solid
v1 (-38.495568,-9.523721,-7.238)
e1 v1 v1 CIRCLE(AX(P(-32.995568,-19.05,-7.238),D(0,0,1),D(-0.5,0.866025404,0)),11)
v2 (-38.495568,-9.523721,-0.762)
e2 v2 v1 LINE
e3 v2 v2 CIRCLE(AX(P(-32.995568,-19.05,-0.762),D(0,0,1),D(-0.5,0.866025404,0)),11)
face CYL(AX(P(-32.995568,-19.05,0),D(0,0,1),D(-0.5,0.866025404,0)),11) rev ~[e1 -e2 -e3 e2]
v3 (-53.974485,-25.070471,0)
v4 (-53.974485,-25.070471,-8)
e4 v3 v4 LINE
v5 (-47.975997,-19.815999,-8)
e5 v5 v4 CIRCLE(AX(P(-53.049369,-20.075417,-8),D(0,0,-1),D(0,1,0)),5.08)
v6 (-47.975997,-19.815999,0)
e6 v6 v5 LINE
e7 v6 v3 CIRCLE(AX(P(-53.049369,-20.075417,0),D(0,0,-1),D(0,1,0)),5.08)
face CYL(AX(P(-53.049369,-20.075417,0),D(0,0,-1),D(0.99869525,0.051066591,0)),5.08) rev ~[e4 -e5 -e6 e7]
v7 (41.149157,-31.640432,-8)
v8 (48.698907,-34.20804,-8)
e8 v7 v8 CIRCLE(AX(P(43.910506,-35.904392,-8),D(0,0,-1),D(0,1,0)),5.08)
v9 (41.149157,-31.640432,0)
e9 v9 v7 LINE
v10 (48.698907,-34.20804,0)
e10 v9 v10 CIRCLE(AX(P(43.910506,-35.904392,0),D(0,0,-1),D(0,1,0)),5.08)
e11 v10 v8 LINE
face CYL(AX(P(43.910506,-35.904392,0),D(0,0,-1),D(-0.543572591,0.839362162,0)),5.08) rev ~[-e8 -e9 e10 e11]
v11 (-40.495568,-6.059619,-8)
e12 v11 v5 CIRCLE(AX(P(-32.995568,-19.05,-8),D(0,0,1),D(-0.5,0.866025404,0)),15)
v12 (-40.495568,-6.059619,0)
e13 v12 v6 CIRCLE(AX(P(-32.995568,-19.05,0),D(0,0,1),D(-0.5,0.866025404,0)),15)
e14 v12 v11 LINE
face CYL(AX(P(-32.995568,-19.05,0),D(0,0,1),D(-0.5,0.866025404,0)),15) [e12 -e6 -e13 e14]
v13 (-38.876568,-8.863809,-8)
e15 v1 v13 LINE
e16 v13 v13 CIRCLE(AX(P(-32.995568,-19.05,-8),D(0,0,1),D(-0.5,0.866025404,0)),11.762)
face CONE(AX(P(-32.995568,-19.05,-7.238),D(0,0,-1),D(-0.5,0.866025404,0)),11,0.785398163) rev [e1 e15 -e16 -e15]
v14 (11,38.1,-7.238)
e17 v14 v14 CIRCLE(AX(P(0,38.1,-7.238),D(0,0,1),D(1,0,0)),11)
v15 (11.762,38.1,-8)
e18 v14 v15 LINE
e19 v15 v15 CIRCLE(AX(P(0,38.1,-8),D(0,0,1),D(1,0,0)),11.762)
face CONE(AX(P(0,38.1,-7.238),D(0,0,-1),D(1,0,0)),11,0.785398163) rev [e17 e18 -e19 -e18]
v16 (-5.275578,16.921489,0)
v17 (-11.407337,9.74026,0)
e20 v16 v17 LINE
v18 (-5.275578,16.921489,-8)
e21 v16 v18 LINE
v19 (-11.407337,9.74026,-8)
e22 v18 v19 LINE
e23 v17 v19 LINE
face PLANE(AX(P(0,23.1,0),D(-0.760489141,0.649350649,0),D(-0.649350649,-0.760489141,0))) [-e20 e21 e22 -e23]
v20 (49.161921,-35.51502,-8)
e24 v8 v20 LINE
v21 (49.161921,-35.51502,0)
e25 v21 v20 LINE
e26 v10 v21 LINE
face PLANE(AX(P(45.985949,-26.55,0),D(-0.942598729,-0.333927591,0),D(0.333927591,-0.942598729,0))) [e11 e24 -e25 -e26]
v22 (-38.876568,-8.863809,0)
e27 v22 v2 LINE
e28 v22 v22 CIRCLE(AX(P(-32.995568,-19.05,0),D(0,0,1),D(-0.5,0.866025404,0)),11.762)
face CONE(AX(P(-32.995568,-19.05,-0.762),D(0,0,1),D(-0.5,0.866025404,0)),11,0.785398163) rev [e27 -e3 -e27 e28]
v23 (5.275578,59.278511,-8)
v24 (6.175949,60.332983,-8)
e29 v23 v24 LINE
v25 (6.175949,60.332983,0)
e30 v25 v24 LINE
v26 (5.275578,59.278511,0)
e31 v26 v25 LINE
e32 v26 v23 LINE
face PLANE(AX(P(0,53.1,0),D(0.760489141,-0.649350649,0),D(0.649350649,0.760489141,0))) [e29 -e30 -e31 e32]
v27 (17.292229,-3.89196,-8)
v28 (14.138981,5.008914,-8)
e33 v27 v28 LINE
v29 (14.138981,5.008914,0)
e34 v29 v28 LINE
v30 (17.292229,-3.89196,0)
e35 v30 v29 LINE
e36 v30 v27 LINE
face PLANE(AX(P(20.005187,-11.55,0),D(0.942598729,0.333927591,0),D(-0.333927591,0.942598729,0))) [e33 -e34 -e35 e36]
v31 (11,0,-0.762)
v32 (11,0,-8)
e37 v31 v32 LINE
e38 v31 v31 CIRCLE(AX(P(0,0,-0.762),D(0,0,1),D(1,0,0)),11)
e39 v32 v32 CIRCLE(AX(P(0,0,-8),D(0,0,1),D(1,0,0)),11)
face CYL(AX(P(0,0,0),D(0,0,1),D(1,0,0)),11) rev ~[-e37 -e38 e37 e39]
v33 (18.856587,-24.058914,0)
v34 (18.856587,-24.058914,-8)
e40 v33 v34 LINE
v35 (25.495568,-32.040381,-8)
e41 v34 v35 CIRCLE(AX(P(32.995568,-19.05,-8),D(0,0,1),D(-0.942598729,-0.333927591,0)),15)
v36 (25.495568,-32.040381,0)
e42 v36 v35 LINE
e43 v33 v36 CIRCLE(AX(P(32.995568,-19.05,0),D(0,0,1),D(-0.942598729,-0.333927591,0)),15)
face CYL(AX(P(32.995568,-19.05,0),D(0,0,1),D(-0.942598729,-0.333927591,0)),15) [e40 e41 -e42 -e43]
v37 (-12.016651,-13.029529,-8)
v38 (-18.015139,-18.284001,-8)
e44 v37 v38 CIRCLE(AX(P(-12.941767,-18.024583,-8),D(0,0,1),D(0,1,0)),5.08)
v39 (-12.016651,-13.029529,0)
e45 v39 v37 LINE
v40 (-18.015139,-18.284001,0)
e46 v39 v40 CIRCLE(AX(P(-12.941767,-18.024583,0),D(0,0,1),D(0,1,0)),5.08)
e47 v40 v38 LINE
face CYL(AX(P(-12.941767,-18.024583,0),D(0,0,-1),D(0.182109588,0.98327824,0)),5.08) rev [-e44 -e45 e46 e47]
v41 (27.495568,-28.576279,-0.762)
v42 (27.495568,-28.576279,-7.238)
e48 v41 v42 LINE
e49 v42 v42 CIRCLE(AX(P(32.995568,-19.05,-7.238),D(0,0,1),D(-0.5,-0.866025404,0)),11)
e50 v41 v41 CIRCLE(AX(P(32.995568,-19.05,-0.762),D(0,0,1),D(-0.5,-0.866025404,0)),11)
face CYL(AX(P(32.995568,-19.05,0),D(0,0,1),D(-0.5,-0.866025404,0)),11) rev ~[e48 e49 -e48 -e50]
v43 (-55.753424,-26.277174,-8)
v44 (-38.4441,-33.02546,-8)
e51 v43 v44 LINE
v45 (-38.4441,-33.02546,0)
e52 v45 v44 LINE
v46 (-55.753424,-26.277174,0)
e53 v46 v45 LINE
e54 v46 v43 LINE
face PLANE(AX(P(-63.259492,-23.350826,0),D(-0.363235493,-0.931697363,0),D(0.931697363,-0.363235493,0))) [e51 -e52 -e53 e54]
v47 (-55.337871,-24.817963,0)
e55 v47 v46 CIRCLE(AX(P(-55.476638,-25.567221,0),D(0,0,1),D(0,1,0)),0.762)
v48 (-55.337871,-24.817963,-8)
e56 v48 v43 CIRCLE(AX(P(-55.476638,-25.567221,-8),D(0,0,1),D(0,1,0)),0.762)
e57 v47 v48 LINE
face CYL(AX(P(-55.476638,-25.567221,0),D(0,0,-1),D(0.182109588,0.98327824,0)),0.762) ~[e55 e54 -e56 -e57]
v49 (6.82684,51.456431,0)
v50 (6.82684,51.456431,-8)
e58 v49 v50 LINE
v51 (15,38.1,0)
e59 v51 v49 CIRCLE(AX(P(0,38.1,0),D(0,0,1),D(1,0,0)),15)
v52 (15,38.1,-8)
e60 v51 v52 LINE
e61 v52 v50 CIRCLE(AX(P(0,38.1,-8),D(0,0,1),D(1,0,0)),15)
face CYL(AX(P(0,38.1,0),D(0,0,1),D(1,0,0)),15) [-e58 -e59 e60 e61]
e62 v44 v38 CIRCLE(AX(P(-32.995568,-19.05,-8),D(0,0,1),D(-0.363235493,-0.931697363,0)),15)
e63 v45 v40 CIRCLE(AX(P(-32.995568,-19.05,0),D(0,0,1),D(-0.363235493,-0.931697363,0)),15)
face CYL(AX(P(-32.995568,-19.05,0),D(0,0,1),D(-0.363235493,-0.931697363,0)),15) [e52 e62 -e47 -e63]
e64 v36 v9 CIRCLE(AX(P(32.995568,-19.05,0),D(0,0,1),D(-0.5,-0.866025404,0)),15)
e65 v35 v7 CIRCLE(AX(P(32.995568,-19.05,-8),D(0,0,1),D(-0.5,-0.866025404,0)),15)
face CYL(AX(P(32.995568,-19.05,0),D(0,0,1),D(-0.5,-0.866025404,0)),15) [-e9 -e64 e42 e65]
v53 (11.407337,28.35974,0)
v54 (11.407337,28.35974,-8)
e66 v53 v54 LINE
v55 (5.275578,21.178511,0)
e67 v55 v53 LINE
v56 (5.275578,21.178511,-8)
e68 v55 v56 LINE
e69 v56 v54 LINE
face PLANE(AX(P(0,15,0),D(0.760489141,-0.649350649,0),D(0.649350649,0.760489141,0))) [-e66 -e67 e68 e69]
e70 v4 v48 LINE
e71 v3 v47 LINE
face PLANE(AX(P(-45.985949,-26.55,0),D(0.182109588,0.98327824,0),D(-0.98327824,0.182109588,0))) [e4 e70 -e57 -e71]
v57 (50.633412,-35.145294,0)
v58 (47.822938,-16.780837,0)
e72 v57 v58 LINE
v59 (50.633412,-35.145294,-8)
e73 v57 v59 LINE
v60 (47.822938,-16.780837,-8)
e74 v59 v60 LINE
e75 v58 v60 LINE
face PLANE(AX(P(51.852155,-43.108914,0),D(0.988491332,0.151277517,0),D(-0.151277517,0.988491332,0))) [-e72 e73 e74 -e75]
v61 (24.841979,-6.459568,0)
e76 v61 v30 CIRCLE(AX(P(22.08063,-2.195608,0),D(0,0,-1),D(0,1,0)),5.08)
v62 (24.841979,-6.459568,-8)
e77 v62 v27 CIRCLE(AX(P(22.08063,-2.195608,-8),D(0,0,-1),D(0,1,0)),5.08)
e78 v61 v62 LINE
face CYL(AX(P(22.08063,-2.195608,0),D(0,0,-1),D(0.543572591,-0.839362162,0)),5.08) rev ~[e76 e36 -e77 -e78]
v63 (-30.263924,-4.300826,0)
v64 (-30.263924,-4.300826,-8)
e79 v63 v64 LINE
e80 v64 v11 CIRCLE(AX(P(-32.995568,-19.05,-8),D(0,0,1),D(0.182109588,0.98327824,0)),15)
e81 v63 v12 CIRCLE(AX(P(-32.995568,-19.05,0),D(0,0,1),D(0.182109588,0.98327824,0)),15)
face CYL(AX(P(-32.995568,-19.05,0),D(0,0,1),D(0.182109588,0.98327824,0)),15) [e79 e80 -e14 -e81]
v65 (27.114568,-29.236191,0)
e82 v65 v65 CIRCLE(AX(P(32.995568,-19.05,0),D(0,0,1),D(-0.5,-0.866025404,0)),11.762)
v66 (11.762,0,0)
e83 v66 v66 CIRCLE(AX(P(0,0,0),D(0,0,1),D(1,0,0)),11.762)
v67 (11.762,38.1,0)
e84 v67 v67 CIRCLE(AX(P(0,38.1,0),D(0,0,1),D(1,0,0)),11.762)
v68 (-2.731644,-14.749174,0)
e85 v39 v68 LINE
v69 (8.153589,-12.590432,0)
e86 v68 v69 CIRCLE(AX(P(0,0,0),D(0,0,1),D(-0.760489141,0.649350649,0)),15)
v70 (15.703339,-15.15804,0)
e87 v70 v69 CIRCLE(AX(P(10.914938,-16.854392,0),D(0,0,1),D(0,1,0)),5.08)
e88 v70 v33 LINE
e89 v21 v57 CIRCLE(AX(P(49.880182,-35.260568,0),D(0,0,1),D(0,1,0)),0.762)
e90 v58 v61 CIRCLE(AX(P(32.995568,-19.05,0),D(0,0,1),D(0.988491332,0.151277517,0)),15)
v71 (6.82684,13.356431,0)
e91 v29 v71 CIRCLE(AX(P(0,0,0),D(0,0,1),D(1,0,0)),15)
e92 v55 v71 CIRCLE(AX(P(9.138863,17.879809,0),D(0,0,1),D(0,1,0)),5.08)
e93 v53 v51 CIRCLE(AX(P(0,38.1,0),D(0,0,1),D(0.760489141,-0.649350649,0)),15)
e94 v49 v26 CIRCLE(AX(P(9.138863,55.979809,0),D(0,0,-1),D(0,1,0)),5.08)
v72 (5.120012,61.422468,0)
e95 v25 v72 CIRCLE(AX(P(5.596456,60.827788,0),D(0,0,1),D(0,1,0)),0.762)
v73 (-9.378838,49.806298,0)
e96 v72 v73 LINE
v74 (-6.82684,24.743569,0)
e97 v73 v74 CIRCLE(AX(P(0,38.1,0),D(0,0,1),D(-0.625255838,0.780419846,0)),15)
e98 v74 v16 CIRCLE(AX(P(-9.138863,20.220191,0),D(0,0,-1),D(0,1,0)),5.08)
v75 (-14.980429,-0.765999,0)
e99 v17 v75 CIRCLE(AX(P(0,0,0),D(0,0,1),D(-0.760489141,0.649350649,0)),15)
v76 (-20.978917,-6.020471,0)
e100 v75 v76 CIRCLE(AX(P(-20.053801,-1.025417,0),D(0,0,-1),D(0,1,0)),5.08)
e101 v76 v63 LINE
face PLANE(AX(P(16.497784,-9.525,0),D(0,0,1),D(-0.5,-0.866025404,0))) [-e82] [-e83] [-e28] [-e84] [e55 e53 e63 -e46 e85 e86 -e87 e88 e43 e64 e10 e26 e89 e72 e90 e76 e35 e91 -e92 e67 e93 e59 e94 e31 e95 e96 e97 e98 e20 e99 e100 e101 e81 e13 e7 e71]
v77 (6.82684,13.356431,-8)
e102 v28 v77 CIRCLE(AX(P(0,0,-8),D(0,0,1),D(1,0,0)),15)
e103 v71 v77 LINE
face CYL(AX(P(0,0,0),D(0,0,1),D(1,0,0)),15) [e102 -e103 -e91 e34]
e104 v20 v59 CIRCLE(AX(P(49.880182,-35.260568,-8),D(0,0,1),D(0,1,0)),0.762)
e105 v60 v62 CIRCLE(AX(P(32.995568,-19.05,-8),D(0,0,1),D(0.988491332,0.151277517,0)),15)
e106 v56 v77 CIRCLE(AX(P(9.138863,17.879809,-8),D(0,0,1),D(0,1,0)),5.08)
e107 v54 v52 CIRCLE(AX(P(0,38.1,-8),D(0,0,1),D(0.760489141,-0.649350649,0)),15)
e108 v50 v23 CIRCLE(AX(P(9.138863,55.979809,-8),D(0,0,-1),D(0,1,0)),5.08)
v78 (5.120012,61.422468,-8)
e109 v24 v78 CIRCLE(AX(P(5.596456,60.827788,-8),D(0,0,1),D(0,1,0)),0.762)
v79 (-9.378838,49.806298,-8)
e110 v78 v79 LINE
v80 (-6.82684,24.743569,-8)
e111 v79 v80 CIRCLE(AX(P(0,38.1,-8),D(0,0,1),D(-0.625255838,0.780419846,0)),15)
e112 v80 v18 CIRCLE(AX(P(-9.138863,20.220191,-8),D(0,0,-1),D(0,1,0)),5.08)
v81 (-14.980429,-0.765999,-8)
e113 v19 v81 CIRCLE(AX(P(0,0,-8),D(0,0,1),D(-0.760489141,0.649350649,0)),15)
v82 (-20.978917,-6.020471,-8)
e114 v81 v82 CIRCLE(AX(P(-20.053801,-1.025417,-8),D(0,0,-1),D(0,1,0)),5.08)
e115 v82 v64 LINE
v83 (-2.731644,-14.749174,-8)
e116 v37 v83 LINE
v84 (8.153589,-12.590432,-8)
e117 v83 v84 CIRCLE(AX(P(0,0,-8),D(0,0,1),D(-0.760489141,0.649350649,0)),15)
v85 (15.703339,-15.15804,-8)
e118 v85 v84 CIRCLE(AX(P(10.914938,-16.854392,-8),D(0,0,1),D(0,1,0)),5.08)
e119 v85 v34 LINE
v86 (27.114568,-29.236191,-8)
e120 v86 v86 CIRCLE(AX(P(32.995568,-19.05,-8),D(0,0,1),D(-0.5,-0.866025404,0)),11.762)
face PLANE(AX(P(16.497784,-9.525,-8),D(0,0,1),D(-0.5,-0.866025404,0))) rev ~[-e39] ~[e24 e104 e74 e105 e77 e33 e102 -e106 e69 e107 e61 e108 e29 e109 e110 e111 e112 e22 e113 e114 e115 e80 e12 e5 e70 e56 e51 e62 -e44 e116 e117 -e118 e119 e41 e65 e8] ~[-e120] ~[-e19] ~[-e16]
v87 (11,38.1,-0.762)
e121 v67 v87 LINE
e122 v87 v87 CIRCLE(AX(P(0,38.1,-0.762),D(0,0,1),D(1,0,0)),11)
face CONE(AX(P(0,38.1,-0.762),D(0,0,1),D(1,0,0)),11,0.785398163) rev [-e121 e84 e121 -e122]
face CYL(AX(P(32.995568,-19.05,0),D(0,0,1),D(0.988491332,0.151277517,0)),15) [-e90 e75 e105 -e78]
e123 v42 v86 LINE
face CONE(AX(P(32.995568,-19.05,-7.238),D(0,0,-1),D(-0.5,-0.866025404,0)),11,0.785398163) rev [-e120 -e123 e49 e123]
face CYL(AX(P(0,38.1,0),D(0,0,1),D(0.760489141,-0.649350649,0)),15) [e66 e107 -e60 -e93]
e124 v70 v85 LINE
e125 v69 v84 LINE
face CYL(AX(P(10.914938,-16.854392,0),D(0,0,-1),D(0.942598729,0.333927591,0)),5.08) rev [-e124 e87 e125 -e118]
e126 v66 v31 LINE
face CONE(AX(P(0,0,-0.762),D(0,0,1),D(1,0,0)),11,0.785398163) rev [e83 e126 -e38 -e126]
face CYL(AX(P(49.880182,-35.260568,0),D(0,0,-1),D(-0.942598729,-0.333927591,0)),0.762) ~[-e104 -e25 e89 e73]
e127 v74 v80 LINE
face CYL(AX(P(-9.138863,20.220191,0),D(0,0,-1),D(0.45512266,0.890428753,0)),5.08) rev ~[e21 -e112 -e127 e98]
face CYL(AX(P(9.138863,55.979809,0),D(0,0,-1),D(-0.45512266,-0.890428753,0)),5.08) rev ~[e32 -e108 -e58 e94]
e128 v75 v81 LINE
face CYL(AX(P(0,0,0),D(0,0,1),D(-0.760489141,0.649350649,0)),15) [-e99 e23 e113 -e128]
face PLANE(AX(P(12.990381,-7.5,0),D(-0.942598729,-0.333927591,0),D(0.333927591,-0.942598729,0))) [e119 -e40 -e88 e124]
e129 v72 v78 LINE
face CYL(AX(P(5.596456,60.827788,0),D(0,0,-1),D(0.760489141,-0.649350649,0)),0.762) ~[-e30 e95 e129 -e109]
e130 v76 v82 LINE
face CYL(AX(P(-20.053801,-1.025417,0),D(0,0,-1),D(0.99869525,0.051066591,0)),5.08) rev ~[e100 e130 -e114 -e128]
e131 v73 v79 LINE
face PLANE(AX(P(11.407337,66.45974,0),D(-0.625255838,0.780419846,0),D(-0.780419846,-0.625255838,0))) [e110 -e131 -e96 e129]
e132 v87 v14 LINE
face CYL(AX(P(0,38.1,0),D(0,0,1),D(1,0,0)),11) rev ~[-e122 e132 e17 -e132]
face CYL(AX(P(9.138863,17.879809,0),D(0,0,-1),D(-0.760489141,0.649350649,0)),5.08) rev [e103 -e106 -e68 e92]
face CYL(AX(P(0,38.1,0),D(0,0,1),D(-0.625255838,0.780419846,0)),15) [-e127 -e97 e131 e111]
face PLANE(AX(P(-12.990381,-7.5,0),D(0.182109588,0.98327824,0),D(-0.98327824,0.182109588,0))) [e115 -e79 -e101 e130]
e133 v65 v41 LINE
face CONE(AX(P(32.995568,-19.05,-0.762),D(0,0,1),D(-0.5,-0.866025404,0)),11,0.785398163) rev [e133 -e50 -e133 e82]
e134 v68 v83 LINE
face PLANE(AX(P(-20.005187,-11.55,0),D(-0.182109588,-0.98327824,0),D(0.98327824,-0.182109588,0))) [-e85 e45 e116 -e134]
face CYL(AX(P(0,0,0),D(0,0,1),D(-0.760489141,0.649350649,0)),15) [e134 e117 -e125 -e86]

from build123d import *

# Parameters (mm, degrees)
F0_R            = 11
F1_DEPTH        = 8
F2_DEPTH        = 8
F2_COPIES_COUNT = 3
F3_R            = 5.08
F4_F1_R         = 0.762
F4_F2_R         = 0.762
F4_F3_R         = 0.762
F5_SIZE         = 0.762


# Not quite as in the source:
# - a pattern or mirror of a feature is missing from the dataset's text; its kind, count and spacing are read off the source's solid


with BuildPart() as f1:
    # F0 (on Top) → F1 (new body)
    with BuildSketch(Plane.XY):
        with BuildLine():
            ThreePointArc((-11.407337121, 9.7402597403), (-5.190854611, -14.0732024929), (15, 0))
            ThreePointArc((15, 0), (10.6066017178, 10.6066017178), (0, 15))
            ThreePointArc((0, 15), (-6.2807684202, 13.6217454114), (-11.407337121, 9.7402597403))
        make_face()
        Circle(F0_R, mode=Mode.SUBTRACT)
    extrude(amount=-F1_DEPTH)

    # F0 (on Top) → F2 (join, through all)
    with BuildSketch(Plane.XY):
        with BuildLine():
            ThreePointArc((-11.407337121, 9.7402597403), (-6.2807684202, 13.6217454114), (0, 15))
            Line((0, 15), (11.407337121, 28.3597402597))
            ThreePointArc((11.407337121, 28.3597402597), (6.2807684202, 24.4782545886), (0, 23.1))
            Line((0, 23.1), (-11.407337121, 9.7402597403))
        make_face()
        with BuildLine():
            ThreePointArc((0, 23.1), (6.2807684202, 24.4782545886), (11.407337121, 28.3597402597))
            ThreePointArc((11.407337121, 28.3597402597), (14.0732024929, 32.909145389), (15, 38.1))
            ThreePointArc((15, 38.1), (10.6066017178, 48.7066017178), (0, 53.1))
            ThreePointArc((0, 53.1), (-4.9701878524, 52.2526404855), (-9.378837576, 49.806297695))
            ThreePointArc((-9.378837576, 49.806297695), (-14.1526404855, 33.1298121476), (0, 23.1))
        make_face()
        with Locations((0, 38.1)):
            Circle(F0_R, mode=Mode.SUBTRACT)
        with BuildLine():
            Line((11.407337121, 66.4597402597), (-9.378837576, 49.806297695))
            ThreePointArc((-9.378837576, 49.806297695), (-4.9701878524, 52.2526404855), (0, 53.1))
            Line((0, 53.1), (11.407337121, 66.4597402597))
        make_face()
    f2 = extrude(amount=-F2_DEPTH)

    # F2_copies: F2 ×3 about axis
    f2_copies_axis = Axis((0, 0, 0), (0, 0, 1))
    for i in range(1, F2_COPIES_COUNT):
        add(f2.rotate(f2_copies_axis, i * 360 / F2_COPIES_COUNT))

    # F3
    f3_edges = [f1.edges().sort_by_distance(p)[0] for p in [
        (0, 15, -4),
        (0, 23.1, -4),
        (0, 53.1, -4),
        (20.005187, -11.55, -4),
        (-12.990381, -7.5, -4),
        (-45.985949, -26.55, -4),
        (-20.005187, -11.55, -4),
        (12.990381, -7.5, -4),
        (45.985949, -26.55, -4),
    ]]
    fillet(f3_edges, radius=F3_R)

    # F4: fillet of radius 0.762 on 3 edges, made by hand

    # F4_f1
    f4_f1_edges = [f1.edges().sort_by_distance(p)[0] for p in [
        (51.8521548333, -43.1089138662, -4),
    ]]
    fillet(f4_f1_edges, radius=F4_F1_R)

    # F4_f2
    f4_f2_edges = [f1.edges().sort_by_distance(p)[0] for p in [
        (11.407337121, 66.4597402597, -4),
    ]]
    fillet(f4_f2_edges, radius=F4_F2_R)

    # F4_f3
    f4_f3_edges = [f1.edges().sort_by_distance(p)[0] for p in [
        (-63.2594919544, -23.3508263935, -4),
    ]]
    fillet(f4_f3_edges, radius=F4_F3_R)

    # F5
    f5_edges = [f1.edges().sort_by_distance(p)[0] for p in [
        (-11, 0, 0),
        (-11, 38.1, 0),
        (-11, 38.1, -8),
        (-27.495568, -28.576279, -8),
        (38.495568, -9.523721, -8),
        (-27.495568, -28.576279, 0),
        (38.495568, -9.523721, 0),
    ]]
    chamfer(f5_edges, length=F5_SIZE)


solid = f1.part
